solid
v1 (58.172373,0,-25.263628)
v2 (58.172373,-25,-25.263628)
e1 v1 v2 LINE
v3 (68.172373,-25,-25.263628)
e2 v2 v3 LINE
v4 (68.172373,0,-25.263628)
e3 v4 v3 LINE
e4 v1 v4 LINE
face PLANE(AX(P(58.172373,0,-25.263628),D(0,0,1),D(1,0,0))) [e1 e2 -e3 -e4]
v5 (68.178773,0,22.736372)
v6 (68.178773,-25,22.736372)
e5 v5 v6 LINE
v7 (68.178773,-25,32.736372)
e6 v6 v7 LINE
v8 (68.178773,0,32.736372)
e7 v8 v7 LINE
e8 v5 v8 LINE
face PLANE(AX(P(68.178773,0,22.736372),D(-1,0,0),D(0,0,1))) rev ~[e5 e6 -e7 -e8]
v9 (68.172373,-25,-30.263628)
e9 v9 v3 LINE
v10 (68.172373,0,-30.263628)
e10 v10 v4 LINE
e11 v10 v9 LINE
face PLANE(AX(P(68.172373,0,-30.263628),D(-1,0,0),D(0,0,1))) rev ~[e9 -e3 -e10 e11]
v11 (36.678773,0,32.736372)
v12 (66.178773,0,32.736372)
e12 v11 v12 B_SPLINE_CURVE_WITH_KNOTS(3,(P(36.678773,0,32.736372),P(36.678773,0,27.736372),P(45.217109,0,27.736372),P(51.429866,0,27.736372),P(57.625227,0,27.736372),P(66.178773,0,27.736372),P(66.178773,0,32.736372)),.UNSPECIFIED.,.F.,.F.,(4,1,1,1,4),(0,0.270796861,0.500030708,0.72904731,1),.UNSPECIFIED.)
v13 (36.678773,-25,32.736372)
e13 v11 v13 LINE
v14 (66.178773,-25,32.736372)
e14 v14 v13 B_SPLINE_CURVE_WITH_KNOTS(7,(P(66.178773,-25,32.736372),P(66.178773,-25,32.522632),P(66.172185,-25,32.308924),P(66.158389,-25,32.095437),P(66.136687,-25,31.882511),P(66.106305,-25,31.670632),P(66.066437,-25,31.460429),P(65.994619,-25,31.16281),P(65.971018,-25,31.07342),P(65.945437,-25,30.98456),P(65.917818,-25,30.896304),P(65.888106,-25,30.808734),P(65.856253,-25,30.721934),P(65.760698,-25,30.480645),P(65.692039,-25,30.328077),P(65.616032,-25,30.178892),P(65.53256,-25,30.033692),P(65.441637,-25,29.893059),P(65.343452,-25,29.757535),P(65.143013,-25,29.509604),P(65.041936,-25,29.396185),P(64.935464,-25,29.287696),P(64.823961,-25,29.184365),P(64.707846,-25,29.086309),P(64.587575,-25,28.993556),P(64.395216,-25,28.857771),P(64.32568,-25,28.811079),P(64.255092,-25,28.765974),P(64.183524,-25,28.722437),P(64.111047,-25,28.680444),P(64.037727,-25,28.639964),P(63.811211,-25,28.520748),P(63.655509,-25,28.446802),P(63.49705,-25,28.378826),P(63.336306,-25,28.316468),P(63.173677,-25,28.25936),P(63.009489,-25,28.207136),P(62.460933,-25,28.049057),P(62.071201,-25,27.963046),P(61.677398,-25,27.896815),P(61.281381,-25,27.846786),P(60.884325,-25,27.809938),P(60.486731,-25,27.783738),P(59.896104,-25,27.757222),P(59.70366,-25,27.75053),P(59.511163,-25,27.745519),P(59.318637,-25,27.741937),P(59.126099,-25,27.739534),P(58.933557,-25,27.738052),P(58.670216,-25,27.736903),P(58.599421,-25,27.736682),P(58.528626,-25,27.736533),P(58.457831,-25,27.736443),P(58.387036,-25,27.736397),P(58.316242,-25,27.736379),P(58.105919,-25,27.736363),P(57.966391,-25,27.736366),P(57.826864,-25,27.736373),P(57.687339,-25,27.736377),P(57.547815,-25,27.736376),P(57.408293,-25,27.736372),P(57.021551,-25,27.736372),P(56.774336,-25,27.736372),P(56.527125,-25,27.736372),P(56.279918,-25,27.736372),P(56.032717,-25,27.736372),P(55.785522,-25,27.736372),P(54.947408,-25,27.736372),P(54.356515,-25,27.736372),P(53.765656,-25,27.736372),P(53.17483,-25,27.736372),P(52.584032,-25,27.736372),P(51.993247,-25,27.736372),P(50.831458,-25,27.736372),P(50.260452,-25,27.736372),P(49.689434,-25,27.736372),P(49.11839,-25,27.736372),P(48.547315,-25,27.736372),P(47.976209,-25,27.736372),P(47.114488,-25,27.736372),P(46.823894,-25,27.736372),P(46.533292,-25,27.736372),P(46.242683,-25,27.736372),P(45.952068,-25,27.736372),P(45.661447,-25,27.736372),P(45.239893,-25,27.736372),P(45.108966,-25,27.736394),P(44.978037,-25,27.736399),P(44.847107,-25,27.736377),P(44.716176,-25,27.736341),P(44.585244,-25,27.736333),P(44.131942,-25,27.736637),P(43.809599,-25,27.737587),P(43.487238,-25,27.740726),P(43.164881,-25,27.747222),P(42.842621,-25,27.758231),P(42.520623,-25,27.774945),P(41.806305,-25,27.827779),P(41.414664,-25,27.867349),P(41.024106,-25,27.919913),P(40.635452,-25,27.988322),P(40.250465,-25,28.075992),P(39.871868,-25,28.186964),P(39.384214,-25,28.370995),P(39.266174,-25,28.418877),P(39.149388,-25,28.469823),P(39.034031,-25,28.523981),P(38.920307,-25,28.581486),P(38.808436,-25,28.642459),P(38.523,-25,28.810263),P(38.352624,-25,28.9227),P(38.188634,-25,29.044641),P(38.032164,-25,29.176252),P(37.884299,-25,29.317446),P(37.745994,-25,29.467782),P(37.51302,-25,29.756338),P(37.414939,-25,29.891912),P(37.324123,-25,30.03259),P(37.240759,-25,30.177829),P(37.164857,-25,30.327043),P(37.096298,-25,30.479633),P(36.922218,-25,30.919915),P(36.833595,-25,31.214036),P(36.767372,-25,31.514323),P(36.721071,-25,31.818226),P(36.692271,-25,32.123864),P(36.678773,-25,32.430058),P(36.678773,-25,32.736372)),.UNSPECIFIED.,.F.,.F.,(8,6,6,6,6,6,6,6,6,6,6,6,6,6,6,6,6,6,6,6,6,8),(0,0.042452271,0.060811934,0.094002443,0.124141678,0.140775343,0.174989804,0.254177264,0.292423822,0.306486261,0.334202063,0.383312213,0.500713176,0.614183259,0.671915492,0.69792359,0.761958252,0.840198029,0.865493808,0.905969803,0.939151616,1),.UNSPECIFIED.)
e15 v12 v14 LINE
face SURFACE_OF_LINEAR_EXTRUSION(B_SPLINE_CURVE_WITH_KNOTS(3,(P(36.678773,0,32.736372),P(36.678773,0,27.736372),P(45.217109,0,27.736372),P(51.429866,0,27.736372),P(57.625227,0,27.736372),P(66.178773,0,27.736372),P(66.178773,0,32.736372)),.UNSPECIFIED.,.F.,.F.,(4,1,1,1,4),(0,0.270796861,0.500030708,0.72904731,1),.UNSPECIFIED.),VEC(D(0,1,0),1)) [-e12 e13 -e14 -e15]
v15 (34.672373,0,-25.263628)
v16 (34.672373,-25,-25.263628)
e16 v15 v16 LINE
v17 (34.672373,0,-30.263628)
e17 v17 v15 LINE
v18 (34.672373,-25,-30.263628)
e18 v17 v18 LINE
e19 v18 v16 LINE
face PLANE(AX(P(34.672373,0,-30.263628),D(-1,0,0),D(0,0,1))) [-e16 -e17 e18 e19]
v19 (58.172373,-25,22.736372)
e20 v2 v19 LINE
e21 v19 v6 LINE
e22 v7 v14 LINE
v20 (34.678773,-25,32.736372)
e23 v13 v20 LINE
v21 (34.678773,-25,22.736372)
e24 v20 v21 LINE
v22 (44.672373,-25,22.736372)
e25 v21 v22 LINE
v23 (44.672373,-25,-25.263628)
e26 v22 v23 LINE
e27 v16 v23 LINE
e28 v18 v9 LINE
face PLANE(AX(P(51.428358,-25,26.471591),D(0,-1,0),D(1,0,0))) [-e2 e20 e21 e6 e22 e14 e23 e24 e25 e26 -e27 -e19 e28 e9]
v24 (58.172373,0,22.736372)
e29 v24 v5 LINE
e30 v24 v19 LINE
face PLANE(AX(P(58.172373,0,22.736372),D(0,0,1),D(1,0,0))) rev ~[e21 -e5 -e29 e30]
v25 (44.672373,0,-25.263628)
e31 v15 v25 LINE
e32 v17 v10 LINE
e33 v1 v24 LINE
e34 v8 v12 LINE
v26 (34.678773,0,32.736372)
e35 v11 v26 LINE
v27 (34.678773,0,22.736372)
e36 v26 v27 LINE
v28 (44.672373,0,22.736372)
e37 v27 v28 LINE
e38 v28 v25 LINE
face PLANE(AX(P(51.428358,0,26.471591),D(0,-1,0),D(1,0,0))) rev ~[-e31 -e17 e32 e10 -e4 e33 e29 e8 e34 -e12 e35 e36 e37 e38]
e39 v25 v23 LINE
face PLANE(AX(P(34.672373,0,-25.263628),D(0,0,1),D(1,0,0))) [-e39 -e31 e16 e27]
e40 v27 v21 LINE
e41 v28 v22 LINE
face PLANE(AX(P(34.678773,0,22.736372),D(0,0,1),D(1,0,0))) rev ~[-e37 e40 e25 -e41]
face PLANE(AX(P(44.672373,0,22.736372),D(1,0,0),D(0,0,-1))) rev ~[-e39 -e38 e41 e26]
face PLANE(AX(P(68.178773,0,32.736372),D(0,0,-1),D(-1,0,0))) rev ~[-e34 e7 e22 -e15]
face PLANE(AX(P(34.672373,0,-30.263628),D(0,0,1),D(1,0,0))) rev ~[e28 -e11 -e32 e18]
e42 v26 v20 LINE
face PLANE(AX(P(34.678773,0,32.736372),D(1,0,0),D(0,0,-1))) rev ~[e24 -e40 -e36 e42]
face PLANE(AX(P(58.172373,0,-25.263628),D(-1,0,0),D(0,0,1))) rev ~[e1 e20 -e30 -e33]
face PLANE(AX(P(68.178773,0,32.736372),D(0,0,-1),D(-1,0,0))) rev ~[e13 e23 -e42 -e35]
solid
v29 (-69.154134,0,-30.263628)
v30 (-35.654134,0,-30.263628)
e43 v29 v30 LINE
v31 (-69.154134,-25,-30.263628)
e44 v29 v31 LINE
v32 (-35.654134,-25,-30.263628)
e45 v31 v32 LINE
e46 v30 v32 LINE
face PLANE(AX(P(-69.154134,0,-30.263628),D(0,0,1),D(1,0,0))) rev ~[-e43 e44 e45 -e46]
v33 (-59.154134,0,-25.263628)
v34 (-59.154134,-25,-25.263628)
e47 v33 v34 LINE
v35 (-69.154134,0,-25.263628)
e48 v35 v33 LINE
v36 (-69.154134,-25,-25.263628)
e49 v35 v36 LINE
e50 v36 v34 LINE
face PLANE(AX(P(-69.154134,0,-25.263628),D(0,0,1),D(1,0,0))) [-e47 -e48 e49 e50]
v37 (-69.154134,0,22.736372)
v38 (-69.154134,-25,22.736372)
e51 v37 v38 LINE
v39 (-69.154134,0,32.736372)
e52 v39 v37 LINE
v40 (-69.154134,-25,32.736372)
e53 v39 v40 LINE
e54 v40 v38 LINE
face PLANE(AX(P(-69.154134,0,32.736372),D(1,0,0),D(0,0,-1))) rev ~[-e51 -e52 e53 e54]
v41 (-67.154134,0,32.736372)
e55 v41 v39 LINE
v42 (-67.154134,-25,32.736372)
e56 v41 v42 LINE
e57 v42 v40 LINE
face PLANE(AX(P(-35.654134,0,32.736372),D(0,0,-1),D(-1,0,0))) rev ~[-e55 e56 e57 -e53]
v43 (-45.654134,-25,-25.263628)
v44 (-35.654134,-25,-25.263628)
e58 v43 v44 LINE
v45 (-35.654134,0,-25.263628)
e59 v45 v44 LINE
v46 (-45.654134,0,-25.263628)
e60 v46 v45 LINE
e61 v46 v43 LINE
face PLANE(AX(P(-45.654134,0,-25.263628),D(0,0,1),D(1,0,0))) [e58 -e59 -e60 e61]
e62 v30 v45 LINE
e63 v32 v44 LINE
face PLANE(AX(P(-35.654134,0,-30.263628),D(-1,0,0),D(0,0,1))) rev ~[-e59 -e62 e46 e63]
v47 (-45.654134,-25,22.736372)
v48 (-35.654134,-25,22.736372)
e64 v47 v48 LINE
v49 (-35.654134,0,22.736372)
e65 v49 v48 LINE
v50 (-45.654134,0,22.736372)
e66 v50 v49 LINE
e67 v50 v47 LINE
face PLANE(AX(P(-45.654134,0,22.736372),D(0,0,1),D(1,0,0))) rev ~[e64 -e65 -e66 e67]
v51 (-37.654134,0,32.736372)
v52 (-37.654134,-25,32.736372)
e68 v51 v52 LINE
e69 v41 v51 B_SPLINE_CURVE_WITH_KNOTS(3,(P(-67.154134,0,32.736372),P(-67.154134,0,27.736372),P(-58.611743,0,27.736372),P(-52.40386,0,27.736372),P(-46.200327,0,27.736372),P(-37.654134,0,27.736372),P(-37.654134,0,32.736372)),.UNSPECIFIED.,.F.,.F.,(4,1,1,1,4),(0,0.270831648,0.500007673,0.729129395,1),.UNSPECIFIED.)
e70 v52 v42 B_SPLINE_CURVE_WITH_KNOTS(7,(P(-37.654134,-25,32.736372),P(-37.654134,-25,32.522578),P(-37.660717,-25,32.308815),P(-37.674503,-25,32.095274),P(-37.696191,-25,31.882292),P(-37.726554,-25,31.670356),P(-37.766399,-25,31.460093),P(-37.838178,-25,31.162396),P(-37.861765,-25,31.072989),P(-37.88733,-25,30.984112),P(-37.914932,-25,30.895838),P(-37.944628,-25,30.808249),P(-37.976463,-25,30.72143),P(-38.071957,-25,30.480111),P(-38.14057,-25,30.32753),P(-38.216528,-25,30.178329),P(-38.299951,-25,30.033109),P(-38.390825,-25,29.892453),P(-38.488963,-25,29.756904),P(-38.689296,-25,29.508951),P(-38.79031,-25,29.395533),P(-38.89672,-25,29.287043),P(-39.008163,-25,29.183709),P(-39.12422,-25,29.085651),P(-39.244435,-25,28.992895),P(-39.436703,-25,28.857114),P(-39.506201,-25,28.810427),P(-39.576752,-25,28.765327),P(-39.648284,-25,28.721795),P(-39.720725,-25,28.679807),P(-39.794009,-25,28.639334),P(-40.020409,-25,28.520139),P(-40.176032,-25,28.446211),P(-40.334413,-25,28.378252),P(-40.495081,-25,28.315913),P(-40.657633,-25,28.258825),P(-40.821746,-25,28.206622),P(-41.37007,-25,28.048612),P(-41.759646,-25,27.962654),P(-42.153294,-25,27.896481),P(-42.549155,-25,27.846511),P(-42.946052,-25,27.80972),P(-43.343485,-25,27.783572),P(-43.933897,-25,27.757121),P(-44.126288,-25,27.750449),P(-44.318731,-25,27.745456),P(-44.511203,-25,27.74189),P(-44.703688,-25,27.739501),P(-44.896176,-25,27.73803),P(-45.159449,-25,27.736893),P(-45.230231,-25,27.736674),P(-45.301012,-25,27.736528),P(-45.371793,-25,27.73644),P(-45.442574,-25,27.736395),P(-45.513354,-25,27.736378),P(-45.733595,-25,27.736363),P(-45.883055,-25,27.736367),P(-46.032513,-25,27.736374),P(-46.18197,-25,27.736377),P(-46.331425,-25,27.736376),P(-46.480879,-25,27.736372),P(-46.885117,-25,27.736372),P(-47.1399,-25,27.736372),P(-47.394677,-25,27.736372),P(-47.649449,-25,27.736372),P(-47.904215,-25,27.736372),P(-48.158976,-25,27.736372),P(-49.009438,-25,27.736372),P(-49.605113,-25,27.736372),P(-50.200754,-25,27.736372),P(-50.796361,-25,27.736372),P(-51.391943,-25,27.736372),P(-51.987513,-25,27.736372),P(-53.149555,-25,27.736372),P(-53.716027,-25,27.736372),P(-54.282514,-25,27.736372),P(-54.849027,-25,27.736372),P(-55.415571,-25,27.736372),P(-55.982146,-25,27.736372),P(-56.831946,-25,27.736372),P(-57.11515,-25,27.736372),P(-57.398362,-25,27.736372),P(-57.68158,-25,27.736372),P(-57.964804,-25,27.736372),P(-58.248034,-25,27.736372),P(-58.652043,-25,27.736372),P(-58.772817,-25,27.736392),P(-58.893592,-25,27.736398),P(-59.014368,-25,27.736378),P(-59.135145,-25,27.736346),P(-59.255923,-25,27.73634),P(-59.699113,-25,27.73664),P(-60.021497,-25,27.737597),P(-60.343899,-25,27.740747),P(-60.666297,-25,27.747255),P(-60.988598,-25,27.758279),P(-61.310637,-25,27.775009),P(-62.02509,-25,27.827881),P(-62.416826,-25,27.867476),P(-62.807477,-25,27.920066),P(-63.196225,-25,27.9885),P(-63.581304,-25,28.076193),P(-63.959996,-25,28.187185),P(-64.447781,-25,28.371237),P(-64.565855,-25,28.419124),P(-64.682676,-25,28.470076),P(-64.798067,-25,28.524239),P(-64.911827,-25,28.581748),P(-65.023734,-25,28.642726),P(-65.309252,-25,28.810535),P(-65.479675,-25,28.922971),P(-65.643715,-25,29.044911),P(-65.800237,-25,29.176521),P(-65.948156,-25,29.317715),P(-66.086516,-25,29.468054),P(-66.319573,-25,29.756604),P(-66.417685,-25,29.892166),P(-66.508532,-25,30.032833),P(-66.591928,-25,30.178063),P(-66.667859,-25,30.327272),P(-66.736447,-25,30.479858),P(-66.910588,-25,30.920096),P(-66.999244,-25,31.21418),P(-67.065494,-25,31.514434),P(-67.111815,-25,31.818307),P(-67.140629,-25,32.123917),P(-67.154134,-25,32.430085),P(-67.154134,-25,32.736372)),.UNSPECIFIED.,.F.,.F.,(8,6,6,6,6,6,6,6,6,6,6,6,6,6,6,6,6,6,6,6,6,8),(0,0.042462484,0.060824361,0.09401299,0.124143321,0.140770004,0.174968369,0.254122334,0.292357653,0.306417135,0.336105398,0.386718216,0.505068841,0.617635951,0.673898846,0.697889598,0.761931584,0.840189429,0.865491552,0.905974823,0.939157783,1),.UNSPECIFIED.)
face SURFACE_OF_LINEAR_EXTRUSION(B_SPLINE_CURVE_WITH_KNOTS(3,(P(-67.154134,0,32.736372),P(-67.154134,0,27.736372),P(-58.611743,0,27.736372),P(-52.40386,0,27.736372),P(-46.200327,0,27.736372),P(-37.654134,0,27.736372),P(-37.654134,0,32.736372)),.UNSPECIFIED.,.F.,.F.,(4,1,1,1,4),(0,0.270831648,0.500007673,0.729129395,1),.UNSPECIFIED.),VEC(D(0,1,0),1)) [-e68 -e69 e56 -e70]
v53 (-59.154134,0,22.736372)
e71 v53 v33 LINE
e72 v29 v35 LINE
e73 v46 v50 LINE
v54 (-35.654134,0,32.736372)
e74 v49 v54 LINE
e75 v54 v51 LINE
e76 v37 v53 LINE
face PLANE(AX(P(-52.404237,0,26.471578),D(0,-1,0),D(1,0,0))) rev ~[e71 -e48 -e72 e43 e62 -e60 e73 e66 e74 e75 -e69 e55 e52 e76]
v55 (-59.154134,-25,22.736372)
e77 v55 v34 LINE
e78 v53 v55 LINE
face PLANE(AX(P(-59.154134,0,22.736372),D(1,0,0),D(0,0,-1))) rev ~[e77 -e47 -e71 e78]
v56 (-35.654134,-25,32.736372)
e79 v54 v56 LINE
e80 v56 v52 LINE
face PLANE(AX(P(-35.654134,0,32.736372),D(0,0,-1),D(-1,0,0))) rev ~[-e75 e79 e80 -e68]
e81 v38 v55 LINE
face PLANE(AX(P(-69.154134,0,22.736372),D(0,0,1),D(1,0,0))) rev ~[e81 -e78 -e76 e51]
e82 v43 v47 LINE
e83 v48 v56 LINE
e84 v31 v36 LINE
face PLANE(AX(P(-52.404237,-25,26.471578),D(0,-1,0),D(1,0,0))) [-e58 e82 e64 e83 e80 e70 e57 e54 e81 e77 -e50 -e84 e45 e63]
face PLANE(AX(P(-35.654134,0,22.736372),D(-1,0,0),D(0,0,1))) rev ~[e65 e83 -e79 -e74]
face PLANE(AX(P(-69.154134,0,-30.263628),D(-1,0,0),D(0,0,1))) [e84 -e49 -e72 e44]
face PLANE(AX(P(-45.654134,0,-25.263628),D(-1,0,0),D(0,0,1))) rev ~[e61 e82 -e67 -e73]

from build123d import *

# Parameters (mm, degrees)
F0_W     = 13.5
F0_H     = 48
F0_H_2   = 5
F0_W_2   = 10
F1_DEPTH = 25
F2_DEPTH = 207


# Not quite as in the source:
# - an extrude ends at something that could not be found from the text; its depth is read off the source's solid


with BuildPart() as f1:
    # F0 (on Front) → F1 (new body)
    with BuildSketch(Plane.XZ):
        with BuildLine():
            Line((-67.1541336304, 32.7363717356), (-69.1541336304, 32.7363717356))
            Line((-69.1541336304, 32.7363717356), (-69.1541336304, 22.7363717356))
            Line((-69.1541336304, 22.7363717356), (-59.1541336304, 22.7363717356))
            Line((-59.1541336304, 22.7363717356), (-45.6541336304, 22.7363717356))
            Line((-45.6541336304, 22.7363717356), (-35.6541336304, 22.7363717356))
            Line((-35.6541336304, 22.7363717356), (-35.6541336304, 32.7363717356))
            Line((-35.6541336304, 32.7363717356), (-37.6541336304, 32.7363717356))
            add(Edge.make_bspline(
                [(-67.1541336304, 32.7363717356), (-67.1541336304, 27.7363717356), (-58.6117428449, 27.7363717356), (-52.4038602705, 27.7363717356), (-46.2003270582, 27.7363717356), (-37.6541336304, 27.7363717356), (-37.6541336304, 32.7363717356)],
                knots=[0, 0, 0, 0, 0.2708316482, 0.5000076733, 0.7291293946, 1, 1, 1, 1], degree=3))
        make_face()
        with BuildLine():
            Line((-37.6541336304, 32.7363717356), (-67.1541336304, 32.7363717356))
            add(Edge.make_bspline(
                [(-67.1541336304, 32.7363717356), (-67.1541336304, 27.7363717356), (-58.6117428449, 27.7363717356), (-52.4038602705, 27.7363717356), (-46.2003270582, 27.7363717356), (-37.6541336304, 27.7363717356), (-37.6541336304, 32.7363717356)],
                knots=[0, 0, 0, 0, 0.2708316482, 0.5000076733, 0.7291293946, 1, 1, 1, 1], degree=3))
        make_face()
        with Locations((-52.4041336304, -1.2636282644)):
            Rectangle(F0_W, F0_H)
        with Locations((-52.4041336304, -27.7636282644)):
            Rectangle(F0_W, F0_H_2)
        with Locations((-64.1541336304, -27.7636282644)):
            Rectangle(F0_W_2, F0_H_2)
        with Locations((-40.6541336304, -27.7636282644)):
            Rectangle(F0_W_2, F0_H_2)
    extrude(amount=F1_DEPTH)


with BuildPart() as f1b:
    # F0 (on Front) → F1, piece 2 (new body)
    with BuildSketch(Plane.XZ):
        with BuildLine():
            Line((36.6787728249, 32.7363717356), (34.6787728249, 32.7363717356))
            Line((34.6787728249, 32.7363717356), (34.6787728249, 22.7363717356))
            Line((34.6787728249, 22.7363717356), (44.6723728249, 22.7363717356))
            Line((44.6723728249, 22.7363717356), (58.1723728249, 22.7363717356))
            Line((58.1723728249, 22.7363717356), (68.1787728249, 22.7363717356))
            Line((68.1787728249, 22.7363717356), (68.1787728249, 32.7363717356))
            Line((68.1787728249, 32.7363717356), (66.1787728249, 32.7363717356))
            add(Edge.make_bspline(
                [(36.6787728249, 32.7363717356), (36.6787728249, 27.7363717356), (45.2171089647, 27.7363717356), (51.4298659754, 27.7363717356), (57.6252269118, 27.7363717356), (66.1787728249, 27.7363717356), (66.1787728249, 32.7363717356)],
                knots=[0, 0, 0, 0, 0.2707968607, 0.5000307078, 0.7290473102, 1, 1, 1, 1], degree=3))
        make_face()
        with BuildLine():
            Line((66.1787728249, 32.7363717356), (36.6787728249, 32.7363717356))
            add(Edge.make_bspline(
                [(36.6787728249, 32.7363717356), (36.6787728249, 27.7363717356), (45.2171089647, 27.7363717356), (51.4298659754, 27.7363717356), (57.6252269118, 27.7363717356), (66.1787728249, 27.7363717356), (66.1787728249, 32.7363717356)],
                knots=[0, 0, 0, 0, 0.2707968607, 0.5000307078, 0.7290473102, 1, 1, 1, 1], degree=3))
        make_face()
        with Locations((51.4223728249, -1.2636282644)):
            Rectangle(F0_W, F0_H)
        with Locations((51.4223728249, -27.7636282644)):
            Rectangle(F0_W, F0_H_2)
        with Locations((39.6723728249, -27.7636282644)):
            Rectangle(F0_W_2, F0_H_2)
        with Locations((63.1723728249, -27.7636282644)):
            Rectangle(F0_W_2, F0_H_2)
    extrude(amount=F1_DEPTH)


with BuildPart() as f2_tool:
    # F1_face (on face) + F0 (on Front) → F2 (new body, through all)
    with BuildSketch(Plane(origin=(-52.4041336304, -25, 3.3224212792), x_dir=(1, 0, 0), z_dir=(0, -1, 0))):
        Polygon((16.75, 29.4139504563), (-16.75, 29.4139504563), (-16.75, 19.4139504563), (-6.75, 19.4139504563), (-6.75, -28.5860495437), (-16.75, -28.5860495437), (-16.75, -33.5860495437), (16.75, -33.5860495437), (16.75, -28.5860495437), (6.75, -28.5860495437), (6.75, 19.4139504563), (16.75, 19.4139504563), align=None)
    with BuildSketch(Plane.XZ):
        with BuildLine():
            Line((66.1787728249, 32.7363717356), (36.6787728249, 32.7363717356))
            add(Edge.make_bspline(
                [(36.6787728249, 32.7363717356), (36.6787728249, 27.7363717356), (45.2171089647, 27.7363717356), (51.4298659754, 27.7363717356), (57.6252269118, 27.7363717356), (66.1787728249, 27.7363717356), (66.1787728249, 32.7363717356)],
                knots=[0, 0, 0, 0, 0.2707968607, 0.5000307078, 0.7290473102, 1, 1, 1, 1], degree=3))
        make_face()
        with BuildLine():
            Line((-37.6541336304, 32.7363717356), (-67.1541336304, 32.7363717356))
            add(Edge.make_bspline(
                [(-67.1541336304, 32.7363717356), (-67.1541336304, 27.7363717356), (-58.6117428449, 27.7363717356), (-52.4038602705, 27.7363717356), (-46.2003270582, 27.7363717356), (-37.6541336304, 27.7363717356), (-37.6541336304, 32.7363717356)],
                knots=[0, 0, 0, 0, 0.2708316482, 0.5000076733, 0.7291293946, 1, 1, 1, 1], degree=3))
        make_face()
    extrude(amount=F2_DEPTH)


with BuildPart() as f1_1:
    add(f1.part)

    # F2: cut by f2_tool
    add(f2_tool.part, mode=Mode.SUBTRACT)


with BuildPart() as f1b_1:
    add(f1b.part)

    # F2: cut by f2_tool
    add(f2_tool.part, mode=Mode.SUBTRACT)


solid = Compound([f1_1.part, f1b_1.part])
